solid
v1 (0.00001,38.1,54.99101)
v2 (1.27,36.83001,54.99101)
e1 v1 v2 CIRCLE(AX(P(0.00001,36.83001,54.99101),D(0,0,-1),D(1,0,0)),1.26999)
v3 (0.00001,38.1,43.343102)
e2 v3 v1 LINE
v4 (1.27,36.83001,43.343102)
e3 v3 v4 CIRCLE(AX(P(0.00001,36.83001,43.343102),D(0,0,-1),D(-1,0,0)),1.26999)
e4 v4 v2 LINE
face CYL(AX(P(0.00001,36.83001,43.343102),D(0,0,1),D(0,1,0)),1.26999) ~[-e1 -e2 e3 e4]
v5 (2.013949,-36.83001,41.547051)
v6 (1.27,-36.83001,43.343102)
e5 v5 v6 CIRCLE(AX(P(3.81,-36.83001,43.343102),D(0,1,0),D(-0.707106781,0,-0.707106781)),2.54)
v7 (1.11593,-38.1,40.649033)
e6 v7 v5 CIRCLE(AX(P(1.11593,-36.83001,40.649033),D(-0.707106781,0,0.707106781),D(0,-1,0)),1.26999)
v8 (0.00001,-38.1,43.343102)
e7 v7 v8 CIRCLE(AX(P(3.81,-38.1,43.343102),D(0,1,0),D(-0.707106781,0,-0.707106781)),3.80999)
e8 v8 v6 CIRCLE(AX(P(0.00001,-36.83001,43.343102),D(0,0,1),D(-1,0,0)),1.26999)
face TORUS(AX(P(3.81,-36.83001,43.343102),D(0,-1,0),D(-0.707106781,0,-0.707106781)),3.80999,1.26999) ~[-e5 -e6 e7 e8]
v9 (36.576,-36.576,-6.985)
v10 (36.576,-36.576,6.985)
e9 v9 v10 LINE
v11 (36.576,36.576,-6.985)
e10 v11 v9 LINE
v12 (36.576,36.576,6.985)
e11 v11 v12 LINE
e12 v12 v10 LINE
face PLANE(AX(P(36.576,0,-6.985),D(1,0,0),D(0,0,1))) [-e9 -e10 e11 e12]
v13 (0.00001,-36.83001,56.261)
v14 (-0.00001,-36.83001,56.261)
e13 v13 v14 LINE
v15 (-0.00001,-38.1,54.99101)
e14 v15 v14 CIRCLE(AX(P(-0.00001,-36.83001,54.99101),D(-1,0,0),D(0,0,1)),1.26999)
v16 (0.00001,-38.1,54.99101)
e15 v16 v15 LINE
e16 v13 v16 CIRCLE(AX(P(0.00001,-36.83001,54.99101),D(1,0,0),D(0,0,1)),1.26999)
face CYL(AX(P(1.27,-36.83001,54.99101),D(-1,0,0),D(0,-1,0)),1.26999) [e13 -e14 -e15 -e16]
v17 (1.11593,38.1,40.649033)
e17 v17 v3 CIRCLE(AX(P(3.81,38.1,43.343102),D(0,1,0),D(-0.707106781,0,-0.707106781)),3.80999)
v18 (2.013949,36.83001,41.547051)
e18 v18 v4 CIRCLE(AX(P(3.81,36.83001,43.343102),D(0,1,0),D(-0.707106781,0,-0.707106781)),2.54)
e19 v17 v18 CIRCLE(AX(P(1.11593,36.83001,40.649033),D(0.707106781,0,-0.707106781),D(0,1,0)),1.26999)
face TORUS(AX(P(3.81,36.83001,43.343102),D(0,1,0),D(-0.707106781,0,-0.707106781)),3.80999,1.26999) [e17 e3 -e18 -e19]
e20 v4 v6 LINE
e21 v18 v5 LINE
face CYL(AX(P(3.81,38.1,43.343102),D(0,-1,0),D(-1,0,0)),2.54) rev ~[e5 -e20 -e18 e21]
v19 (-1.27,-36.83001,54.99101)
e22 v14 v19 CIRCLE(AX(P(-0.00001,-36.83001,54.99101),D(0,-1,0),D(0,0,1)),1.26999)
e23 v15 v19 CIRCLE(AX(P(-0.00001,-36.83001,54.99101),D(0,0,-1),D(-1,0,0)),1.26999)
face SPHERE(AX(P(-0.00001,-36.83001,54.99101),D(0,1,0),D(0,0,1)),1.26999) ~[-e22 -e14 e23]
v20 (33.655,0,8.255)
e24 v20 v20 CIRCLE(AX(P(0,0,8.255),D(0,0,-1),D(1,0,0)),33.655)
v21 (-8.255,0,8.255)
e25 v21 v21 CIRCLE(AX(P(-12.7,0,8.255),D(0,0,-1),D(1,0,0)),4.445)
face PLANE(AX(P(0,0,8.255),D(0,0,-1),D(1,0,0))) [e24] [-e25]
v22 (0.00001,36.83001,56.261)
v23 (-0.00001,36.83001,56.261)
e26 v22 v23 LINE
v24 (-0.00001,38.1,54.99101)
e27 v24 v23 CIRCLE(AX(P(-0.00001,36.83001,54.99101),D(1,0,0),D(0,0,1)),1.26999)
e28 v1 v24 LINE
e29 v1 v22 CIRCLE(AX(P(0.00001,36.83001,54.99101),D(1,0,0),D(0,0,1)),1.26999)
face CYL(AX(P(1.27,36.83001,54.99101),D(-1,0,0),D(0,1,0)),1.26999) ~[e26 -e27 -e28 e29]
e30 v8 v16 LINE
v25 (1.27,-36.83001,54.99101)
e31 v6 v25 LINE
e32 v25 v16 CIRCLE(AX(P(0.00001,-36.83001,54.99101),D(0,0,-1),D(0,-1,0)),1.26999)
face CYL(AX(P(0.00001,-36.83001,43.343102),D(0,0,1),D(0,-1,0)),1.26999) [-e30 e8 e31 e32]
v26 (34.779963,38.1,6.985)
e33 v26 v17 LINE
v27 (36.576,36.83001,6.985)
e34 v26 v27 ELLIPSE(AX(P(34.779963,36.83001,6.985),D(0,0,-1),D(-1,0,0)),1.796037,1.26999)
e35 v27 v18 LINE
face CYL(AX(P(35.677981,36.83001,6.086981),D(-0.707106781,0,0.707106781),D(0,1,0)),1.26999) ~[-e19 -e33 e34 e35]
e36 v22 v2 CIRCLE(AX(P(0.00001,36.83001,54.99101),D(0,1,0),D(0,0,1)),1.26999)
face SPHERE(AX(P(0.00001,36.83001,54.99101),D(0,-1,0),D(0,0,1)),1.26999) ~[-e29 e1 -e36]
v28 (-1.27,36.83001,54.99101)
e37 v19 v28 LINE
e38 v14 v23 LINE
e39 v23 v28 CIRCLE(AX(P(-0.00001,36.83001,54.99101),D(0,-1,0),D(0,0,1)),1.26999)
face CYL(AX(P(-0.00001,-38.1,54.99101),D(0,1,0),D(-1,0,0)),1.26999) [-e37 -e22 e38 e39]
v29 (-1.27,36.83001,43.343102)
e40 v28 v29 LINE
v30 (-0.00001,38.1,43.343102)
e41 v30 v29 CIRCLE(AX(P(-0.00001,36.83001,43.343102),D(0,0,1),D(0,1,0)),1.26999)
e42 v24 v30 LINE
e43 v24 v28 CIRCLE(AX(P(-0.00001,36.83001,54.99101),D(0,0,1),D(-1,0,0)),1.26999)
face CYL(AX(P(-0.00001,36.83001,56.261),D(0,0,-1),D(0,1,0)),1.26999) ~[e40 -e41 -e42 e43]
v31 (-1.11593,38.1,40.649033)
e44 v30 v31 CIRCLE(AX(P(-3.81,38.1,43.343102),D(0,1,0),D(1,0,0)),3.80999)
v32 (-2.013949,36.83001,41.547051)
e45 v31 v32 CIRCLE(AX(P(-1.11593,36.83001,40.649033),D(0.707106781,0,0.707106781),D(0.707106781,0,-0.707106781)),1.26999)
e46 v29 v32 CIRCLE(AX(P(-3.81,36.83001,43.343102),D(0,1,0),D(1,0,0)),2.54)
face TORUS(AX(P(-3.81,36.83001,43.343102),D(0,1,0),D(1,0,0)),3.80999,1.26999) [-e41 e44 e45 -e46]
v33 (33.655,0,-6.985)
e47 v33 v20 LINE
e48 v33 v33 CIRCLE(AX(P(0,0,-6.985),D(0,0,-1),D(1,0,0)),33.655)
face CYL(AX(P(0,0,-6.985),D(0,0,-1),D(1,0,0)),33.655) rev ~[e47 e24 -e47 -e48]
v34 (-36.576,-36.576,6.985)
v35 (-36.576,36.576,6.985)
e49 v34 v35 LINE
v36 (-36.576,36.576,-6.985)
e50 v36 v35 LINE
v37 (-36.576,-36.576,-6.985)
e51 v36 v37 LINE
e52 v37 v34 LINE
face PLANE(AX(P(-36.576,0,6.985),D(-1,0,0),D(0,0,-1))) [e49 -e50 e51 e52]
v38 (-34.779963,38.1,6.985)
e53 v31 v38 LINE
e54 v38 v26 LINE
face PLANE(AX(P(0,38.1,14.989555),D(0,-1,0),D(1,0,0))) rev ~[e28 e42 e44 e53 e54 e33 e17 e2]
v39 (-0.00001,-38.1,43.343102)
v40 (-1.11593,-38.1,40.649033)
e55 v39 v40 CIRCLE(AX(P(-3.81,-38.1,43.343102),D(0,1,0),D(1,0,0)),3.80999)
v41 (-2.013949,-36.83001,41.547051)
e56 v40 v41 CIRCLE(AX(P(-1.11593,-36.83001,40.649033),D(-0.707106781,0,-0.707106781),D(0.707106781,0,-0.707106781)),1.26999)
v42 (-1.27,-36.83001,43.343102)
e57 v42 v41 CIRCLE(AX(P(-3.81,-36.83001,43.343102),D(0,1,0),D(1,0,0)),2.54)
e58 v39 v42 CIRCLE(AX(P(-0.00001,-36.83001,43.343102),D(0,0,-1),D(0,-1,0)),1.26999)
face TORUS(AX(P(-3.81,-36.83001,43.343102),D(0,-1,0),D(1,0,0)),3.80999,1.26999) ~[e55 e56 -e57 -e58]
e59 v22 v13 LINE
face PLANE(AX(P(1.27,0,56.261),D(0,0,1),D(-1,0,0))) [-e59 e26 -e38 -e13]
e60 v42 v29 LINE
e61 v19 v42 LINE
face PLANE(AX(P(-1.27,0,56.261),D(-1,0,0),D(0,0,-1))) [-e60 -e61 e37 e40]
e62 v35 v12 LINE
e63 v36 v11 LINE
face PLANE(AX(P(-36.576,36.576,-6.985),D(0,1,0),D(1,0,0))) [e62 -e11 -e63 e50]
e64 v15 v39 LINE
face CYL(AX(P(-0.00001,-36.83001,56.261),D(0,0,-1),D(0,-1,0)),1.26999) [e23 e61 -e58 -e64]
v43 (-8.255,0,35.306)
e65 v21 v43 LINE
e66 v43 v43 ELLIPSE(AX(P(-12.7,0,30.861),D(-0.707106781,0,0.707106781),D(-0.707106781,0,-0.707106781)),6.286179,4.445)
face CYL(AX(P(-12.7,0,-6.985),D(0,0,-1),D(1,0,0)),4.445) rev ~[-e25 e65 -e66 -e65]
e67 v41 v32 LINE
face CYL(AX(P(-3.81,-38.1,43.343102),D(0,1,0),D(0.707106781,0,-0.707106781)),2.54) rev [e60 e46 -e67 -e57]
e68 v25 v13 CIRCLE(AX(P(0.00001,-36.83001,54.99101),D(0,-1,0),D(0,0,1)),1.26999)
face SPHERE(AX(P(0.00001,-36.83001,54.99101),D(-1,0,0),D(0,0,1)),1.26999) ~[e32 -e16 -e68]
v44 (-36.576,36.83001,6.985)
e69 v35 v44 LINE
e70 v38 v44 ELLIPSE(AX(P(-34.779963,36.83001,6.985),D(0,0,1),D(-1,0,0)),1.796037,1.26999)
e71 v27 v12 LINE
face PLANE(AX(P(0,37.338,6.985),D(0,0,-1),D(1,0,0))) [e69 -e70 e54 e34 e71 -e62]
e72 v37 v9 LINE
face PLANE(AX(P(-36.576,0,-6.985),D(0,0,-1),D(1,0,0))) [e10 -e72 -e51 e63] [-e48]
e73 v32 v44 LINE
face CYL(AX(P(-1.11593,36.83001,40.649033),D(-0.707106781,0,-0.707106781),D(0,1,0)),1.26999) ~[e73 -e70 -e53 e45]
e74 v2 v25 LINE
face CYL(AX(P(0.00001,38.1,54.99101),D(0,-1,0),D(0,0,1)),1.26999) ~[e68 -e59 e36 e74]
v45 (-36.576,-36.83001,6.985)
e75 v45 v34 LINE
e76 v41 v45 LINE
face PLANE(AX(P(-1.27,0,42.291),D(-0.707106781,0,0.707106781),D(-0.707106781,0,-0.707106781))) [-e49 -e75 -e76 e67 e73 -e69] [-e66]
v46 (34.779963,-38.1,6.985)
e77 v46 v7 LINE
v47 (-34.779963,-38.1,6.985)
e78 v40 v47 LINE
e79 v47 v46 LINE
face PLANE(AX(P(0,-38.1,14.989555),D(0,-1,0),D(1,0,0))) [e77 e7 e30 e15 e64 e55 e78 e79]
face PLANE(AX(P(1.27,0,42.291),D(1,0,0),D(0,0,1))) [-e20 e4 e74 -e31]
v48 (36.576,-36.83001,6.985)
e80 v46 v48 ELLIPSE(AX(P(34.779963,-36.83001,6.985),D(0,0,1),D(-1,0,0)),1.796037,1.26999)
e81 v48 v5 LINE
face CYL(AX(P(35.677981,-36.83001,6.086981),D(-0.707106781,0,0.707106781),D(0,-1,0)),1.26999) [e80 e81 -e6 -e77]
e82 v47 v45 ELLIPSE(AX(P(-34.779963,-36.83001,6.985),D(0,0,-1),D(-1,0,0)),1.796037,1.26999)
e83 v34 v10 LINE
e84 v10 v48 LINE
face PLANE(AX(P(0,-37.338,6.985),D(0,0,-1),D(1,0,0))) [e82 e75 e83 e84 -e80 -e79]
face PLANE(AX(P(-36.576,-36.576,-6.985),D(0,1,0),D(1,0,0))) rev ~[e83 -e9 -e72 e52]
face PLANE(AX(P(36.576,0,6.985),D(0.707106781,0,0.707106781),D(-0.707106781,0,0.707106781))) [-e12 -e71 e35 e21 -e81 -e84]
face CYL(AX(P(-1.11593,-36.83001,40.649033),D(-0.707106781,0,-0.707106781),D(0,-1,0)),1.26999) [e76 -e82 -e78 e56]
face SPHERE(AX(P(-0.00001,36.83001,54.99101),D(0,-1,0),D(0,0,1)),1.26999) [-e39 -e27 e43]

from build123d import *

# Parameters (mm, degrees)
F1_DEPTH = 38.1
F2_W     = 73.152
F2_H     = 1.524
F3_DEPTH = 13.97
F4_R     = 4.445
F5_DEPTH = 76.2
F6_R     = 33.655
F6_R_2   = 4.445
F7_DEPTH = 15.24
F8_R     = 2.54
F9_R     = 1.26999


# Not quite as in the source:
# - a fillet or chamfer is up to 0.001 mm smaller than in the source, because OpenCascade refuses the exact size


with BuildPart() as f1:
    # F0 (on Front) → F1 (new body, symmetric)
    with BuildSketch(Plane.XZ):
        Polygon((-36.576, 6.985), (-36.576, -6.985), (36.576, -6.985), (36.576, 6.985), (1.27, 42.291), (1.27, 56.261), (0, 56.261), (-1.27, 56.261), (-1.27, 42.291), align=None)
    extrude(amount=F1_DEPTH, both=True)

    # F2 (on face) → F3 (cut)
    with BuildSketch(Plane(origin=(0, 0, -6.985), x_dir=(1, 0, 0), z_dir=(0, 0, -1))):
        with Locations((0, 37.338)):
            Rectangle(F2_W, F2_H)
        with Locations((0, -37.338)):
            Rectangle(F2_W, F2_H)
    extrude(amount=-F3_DEPTH, mode=Mode.SUBTRACT)

    # F4 (on face) → F5 (cut)
    with BuildSketch(Plane(origin=(0, 0, -6.985), x_dir=(1, 0, 0), z_dir=(0, 0, -1))):
        with Locations((-12.7, 0)):
            Circle(F4_R)
    extrude(amount=-F5_DEPTH, mode=Mode.SUBTRACT)

    # F6 (on face) → F7 (cut)
    with BuildSketch(Plane(origin=(0, 0, -6.985), x_dir=(1, 0, 0), z_dir=(0, 0, -1))):
        Circle(F6_R)
        with Locations((-12.7, 0)):
            Circle(F6_R_2, mode=Mode.SUBTRACT)
    extrude(amount=-F7_DEPTH, mode=Mode.SUBTRACT)

    # F8
    f8_edges = [f1.edges().sort_by_distance(p)[0] for p in [
        (-1.27, 0, 42.291),
        (1.27, 0, 42.291),
    ]]
    fillet(f8_edges, radius=F8_R)

    # F9 (radius 1.27 in the source; OpenCascade refuses exactly that, so slightly less here)
    f9_edges = [f1.edges().sort_by_distance(p)[0] for p in [
        (-1.27, 0, 56.261),
        (0, -38.1, 56.261),
        (1.27, 0, 56.261),
        (0, 38.1, 56.261),
        (-1.27, -38.1, 49.802051),
        (19.294974, -38.1, 24.266026),
        (1.27, -38.1, 49.802051),
        (-1.27, 38.1, 49.802051),
        (1.27, 38.1, 49.802051),
    ]]
    fillet(f9_edges, radius=F9_R)


solid = f1.part
